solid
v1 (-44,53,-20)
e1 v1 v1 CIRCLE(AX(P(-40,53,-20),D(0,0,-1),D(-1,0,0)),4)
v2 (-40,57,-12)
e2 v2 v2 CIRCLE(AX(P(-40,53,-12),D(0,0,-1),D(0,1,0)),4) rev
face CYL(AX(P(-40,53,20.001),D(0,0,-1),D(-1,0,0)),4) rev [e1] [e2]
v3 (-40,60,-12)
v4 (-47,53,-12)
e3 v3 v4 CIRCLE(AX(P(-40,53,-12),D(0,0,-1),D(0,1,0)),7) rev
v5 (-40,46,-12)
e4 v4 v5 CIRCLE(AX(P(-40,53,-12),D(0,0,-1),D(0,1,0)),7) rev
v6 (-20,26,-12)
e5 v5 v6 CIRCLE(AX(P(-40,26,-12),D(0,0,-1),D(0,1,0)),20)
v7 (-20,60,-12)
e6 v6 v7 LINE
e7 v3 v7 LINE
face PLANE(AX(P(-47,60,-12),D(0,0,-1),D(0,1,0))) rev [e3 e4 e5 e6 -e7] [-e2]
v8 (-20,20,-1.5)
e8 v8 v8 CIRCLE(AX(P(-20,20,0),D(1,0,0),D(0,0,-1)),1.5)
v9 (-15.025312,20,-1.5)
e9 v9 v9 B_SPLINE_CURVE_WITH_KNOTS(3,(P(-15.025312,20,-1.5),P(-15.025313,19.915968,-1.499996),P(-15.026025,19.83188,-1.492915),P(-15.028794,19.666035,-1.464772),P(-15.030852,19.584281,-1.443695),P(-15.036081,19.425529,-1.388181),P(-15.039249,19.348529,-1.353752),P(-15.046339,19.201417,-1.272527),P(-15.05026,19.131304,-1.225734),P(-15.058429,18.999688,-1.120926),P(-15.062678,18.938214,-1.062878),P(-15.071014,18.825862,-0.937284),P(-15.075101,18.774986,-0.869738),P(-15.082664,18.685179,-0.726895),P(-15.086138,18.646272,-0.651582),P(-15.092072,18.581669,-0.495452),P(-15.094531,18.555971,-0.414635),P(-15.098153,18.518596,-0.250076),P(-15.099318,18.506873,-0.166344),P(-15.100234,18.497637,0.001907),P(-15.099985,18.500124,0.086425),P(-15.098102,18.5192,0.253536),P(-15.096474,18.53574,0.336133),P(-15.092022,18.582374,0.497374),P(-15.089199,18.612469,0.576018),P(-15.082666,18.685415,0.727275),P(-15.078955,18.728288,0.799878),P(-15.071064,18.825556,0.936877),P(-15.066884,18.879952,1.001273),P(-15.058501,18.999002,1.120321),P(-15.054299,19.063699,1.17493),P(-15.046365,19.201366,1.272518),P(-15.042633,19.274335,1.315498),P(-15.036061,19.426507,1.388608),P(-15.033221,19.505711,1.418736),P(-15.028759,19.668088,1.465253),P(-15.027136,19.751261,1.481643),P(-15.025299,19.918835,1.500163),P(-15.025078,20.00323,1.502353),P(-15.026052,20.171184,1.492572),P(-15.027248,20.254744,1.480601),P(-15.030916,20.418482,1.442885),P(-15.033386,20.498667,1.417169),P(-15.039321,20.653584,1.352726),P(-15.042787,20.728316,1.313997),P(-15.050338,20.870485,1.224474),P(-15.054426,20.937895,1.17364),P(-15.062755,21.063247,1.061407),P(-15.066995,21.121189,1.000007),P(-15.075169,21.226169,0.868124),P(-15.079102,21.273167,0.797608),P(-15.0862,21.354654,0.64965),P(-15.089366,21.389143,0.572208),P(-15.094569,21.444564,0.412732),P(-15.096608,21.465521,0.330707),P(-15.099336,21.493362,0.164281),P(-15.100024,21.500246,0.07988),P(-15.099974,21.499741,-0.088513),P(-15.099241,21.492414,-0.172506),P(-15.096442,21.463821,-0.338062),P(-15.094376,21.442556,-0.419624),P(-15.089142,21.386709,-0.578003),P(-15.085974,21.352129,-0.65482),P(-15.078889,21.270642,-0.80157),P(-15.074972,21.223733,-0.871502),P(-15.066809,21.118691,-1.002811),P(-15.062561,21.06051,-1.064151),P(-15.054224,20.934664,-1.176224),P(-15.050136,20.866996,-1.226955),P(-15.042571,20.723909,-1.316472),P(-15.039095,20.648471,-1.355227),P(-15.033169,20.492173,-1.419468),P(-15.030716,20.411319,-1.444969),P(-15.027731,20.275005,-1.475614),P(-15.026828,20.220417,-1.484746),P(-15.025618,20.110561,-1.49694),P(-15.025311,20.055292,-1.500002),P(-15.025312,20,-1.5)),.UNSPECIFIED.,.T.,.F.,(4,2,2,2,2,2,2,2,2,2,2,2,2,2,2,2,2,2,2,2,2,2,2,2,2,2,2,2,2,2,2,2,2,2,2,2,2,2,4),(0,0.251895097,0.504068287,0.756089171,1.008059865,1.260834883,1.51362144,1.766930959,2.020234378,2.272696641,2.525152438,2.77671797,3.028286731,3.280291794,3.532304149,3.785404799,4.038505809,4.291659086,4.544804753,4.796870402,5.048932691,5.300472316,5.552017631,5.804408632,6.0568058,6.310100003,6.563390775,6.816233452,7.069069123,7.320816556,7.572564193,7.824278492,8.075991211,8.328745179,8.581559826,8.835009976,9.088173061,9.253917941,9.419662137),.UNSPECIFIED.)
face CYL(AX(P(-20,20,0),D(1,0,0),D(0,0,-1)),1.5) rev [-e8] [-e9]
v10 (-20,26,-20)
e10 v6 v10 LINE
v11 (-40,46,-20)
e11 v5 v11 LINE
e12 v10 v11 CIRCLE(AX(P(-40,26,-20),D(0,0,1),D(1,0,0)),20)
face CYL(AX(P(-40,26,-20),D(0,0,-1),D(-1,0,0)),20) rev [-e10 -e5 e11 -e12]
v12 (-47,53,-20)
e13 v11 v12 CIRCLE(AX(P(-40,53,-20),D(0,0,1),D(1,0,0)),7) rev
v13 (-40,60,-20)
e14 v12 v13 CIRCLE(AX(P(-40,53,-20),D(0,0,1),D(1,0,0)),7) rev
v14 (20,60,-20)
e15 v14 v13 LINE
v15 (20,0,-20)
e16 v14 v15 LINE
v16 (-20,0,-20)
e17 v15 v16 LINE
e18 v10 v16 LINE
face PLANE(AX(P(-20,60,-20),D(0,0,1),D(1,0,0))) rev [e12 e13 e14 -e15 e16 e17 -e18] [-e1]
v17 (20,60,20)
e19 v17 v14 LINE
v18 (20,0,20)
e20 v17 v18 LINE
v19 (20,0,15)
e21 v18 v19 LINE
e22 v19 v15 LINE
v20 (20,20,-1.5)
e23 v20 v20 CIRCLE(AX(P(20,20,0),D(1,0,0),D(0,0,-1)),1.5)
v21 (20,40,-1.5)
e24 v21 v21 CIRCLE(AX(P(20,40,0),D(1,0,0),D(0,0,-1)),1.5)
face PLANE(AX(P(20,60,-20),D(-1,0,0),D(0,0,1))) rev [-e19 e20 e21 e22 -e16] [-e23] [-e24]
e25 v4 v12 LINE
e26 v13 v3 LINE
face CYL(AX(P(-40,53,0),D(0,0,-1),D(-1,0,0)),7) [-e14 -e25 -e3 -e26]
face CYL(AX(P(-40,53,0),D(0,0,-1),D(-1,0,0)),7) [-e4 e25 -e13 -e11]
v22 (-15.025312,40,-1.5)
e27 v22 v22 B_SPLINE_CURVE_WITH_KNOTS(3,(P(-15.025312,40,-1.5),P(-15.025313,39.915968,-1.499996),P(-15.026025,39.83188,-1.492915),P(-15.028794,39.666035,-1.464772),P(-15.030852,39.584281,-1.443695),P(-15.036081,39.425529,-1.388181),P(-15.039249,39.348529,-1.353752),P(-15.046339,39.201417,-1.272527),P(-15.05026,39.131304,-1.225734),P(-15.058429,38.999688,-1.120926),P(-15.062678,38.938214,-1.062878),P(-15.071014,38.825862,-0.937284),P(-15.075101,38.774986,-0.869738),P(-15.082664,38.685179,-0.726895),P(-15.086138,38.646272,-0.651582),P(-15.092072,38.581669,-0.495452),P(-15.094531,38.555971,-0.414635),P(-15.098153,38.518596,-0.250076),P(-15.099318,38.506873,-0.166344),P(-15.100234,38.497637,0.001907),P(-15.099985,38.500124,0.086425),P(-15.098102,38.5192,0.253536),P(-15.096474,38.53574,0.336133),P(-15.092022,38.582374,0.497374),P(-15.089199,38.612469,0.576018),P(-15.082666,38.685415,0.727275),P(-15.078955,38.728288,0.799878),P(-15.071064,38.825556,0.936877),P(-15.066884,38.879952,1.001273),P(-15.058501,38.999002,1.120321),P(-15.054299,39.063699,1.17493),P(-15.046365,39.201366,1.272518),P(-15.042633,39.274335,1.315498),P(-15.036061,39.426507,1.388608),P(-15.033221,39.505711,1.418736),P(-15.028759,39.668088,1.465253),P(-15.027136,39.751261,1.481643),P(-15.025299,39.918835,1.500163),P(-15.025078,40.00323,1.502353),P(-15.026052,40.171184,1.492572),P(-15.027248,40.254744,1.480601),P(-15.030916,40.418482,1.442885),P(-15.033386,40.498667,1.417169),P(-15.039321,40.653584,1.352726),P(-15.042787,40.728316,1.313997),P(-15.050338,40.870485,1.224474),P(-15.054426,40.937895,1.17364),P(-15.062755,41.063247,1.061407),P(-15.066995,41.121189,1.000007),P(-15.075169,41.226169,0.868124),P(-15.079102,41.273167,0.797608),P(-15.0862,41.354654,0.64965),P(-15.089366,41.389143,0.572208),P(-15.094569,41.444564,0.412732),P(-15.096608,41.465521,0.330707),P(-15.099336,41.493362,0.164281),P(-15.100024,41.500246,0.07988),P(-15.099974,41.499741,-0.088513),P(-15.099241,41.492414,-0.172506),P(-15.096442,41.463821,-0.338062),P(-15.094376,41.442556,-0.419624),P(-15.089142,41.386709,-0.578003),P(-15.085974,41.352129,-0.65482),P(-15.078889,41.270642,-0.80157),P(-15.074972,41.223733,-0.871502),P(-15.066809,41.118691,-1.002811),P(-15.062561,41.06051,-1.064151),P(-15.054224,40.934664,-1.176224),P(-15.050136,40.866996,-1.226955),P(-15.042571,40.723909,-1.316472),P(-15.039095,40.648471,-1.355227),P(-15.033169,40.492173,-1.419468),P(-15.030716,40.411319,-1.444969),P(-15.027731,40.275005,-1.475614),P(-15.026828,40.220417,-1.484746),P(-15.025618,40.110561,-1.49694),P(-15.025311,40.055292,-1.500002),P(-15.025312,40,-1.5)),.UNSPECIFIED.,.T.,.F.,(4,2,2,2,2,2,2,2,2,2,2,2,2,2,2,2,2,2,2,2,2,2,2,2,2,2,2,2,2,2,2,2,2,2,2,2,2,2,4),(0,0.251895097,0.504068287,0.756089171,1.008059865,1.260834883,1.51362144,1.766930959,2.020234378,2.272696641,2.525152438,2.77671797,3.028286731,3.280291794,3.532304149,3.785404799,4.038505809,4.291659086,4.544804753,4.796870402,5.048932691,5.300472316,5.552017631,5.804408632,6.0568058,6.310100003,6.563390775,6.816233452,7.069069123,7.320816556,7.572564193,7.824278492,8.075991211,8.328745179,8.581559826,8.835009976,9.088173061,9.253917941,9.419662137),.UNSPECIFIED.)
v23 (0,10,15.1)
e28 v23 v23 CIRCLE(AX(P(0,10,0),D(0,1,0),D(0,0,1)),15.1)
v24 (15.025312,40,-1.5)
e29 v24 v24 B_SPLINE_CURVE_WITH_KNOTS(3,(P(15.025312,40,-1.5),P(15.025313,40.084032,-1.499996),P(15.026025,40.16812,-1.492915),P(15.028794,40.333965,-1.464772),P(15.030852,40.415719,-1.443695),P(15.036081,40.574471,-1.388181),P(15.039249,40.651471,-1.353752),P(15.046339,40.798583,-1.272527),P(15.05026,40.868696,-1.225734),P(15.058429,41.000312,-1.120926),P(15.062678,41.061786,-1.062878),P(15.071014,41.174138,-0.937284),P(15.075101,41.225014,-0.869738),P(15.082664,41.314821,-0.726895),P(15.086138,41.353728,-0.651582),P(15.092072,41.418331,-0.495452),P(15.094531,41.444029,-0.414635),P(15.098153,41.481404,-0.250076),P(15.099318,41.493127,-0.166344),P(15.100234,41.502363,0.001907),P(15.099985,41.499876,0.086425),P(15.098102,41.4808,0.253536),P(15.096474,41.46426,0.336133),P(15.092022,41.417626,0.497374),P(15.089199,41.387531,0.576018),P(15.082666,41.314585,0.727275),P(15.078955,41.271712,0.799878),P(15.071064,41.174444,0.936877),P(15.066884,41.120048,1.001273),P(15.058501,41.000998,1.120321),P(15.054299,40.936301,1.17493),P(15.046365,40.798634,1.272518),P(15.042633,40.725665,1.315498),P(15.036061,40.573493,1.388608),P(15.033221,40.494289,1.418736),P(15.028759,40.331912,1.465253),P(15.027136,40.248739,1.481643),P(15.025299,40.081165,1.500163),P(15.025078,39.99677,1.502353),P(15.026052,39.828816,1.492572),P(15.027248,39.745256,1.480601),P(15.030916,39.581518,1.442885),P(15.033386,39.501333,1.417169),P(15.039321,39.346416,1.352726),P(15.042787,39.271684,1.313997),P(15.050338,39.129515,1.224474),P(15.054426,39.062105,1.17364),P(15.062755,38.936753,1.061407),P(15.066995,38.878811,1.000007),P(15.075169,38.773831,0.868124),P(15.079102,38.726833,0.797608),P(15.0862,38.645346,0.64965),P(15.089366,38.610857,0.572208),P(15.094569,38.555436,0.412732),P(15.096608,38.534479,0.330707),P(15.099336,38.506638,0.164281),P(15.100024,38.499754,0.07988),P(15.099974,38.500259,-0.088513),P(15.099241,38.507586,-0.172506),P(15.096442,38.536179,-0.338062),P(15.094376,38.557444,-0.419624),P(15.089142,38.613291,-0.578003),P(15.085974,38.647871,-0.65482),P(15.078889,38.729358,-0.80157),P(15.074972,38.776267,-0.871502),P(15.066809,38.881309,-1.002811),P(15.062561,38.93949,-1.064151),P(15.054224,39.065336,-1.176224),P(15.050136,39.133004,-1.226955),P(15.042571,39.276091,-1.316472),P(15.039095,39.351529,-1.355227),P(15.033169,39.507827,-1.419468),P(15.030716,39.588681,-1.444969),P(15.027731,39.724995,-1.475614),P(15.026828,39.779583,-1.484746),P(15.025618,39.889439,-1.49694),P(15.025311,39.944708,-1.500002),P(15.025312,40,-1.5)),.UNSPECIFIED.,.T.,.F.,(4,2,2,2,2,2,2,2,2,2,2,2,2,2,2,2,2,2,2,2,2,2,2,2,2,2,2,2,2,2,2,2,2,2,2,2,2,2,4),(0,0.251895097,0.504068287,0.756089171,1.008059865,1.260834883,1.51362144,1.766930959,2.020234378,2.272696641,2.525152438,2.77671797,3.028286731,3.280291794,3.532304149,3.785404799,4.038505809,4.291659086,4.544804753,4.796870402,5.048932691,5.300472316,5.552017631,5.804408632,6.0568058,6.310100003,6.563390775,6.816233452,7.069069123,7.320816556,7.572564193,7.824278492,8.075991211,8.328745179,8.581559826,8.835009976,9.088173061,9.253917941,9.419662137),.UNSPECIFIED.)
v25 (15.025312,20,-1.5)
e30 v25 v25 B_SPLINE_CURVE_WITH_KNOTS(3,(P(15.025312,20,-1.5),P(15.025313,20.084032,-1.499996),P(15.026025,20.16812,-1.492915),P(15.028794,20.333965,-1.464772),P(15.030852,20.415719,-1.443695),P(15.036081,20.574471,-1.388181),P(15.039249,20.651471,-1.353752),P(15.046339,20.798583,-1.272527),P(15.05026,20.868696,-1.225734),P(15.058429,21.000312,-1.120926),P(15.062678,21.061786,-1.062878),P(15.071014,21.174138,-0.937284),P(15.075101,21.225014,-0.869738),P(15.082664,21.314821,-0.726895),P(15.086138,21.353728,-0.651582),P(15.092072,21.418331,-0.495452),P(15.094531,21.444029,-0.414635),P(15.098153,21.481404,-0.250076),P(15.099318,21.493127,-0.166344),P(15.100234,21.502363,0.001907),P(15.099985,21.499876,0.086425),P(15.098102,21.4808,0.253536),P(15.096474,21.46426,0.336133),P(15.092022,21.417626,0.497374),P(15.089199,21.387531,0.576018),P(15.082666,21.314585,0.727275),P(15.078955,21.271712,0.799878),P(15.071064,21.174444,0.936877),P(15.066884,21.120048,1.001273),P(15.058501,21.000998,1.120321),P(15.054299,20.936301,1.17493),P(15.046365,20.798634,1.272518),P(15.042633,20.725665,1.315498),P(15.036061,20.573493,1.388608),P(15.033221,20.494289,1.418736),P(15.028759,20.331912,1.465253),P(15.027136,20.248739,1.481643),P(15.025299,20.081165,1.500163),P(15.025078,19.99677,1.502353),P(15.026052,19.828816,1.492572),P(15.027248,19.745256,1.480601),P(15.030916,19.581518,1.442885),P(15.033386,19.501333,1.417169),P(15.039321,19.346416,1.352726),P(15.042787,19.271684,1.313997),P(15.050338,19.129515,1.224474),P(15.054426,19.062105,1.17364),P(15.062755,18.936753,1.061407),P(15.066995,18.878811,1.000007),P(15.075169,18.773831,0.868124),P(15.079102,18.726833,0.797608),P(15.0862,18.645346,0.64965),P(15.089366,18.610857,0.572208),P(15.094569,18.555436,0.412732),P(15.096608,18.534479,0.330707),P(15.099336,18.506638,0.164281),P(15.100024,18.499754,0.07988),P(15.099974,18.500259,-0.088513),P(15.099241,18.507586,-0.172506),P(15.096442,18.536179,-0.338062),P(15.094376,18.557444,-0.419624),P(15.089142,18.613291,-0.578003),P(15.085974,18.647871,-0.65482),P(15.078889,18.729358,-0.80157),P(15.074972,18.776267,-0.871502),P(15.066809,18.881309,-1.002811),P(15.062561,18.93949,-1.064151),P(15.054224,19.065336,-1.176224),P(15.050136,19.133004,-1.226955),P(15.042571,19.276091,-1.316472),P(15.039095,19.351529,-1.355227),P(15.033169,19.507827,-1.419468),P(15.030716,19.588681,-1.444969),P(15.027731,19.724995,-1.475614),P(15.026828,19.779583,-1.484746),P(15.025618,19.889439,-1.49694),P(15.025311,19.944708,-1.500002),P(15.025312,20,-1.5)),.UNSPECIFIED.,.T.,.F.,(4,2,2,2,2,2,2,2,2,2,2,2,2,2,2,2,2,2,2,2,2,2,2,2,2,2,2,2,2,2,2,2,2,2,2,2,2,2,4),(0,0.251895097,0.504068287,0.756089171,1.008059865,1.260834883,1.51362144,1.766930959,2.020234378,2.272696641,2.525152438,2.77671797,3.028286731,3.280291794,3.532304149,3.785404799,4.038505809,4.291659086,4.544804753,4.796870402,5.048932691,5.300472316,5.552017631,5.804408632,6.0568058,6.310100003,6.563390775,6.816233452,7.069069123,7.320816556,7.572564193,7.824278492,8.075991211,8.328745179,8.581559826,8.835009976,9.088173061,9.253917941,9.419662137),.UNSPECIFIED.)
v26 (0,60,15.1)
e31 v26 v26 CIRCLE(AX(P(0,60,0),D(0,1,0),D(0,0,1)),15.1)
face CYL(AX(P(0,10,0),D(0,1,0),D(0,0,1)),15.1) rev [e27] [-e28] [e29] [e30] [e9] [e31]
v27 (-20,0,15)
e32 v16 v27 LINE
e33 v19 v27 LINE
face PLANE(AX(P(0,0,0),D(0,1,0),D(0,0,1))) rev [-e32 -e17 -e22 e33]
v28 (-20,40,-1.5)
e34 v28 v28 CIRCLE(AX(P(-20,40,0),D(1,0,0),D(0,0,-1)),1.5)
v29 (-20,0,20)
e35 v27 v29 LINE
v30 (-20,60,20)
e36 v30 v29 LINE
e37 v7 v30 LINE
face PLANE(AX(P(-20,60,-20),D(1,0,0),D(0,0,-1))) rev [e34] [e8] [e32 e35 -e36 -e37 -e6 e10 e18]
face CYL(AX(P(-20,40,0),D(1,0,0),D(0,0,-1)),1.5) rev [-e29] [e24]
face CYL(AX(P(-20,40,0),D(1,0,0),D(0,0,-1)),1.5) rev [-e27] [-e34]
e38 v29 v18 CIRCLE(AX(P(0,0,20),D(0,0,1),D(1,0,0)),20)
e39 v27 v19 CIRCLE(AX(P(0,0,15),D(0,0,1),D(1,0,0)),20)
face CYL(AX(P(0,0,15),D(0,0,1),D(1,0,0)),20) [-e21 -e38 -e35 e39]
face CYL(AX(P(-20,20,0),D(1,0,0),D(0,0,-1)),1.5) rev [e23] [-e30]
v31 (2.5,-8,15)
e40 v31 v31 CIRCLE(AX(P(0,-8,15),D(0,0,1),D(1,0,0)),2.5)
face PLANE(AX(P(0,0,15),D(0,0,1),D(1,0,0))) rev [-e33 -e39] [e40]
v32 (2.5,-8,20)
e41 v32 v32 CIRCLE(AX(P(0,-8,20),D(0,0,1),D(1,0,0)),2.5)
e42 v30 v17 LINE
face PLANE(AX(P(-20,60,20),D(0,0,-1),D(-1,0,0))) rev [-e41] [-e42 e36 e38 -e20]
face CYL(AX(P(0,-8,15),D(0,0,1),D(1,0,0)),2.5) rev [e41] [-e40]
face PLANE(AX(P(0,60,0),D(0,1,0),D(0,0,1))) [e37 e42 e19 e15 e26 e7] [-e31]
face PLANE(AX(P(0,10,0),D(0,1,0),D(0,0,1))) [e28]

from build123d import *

# Parameters (mm, degrees)
SKETCH_1_W             = 40
SKETCH_1_H             = 40
EXTRUDE_1_DEPTH        = 60
SKETCH_2_R             = 15.1
CUT_EXTRUDE_1_DEPTH    = 50
SKETCH_3_R             = 2.5
EXTRUDE_2_DEPTH        = 5
SKETCH_4_R             = 1.5
CUT_EXTRUDE_2_DEPTH    = 75.833147735
PATTERN_LINEAR_1_COUNT = 2
PATTERN_LINEAR_1_PITCH = 20
SKETCH_5_W             = 8
SKETCH_5_H             = 14
EXTRUDE_3_DEPTH        = 27
FILLET_1_R             = 7
CUT_EXTRUDE_3_REACH    = 88.076
SKETCH_6_R             = 4
FILLET_2_R             = 20


with BuildPart() as part:
    # 草圖1 → 填料-伸長1 (new body)
    with BuildSketch(Plane(origin=(0, 0, 0), x_dir=(1, 0, 0), z_dir=(0, 1, 0))):
        Rectangle(SKETCH_1_W, SKETCH_1_H)
    extrude(amount=EXTRUDE_1_DEPTH)

    # 草圖2 → 除料-伸長1 (cut)
    with BuildSketch(Plane(origin=(0, 60, 0), x_dir=(1, 0, 0), z_dir=(0, 1, 0))):
        with Locations(Location((0, 0, 0), (0, 0, 270))):
            Circle(SKETCH_2_R)
    extrude(amount=-CUT_EXTRUDE_1_DEPTH, mode=Mode.SUBTRACT)

    # 草圖3 → 填料-伸長2 (add)
    with BuildSketch(Plane.XY.offset(20)):
        with BuildLine():
            Line((-20, 0), (20, 0))
            ThreePointArc((20, 0), (0, -20), (-20, 0))
        make_face()
        with Locations((0, -8)):
            Circle(SKETCH_3_R, mode=Mode.SUBTRACT)
    extrude(amount=-EXTRUDE_2_DEPTH)

    # 草圖4 → 除料-伸長2 (cut, through all)
    with BuildSketch(Plane(origin=(20, 0, 0), x_dir=(0, 0, -1), z_dir=(1, 0, 0))):
        with Locations((0, 20)):
            Circle(SKETCH_4_R)
    cut_extrude_2 = extrude(amount=-CUT_EXTRUDE_2_DEPTH, mode=Mode.SUBTRACT)

    # 直線複製排列1: 除料-伸長2 ×2
    with Locations(*[(0, i * PATTERN_LINEAR_1_PITCH, 0) for i in range(1, PATTERN_LINEAR_1_COUNT)]):
        add(cut_extrude_2, mode=Mode.SUBTRACT)

    # 草圖5 → 填料-伸長3 (add)
    with BuildSketch(Plane.ZY.offset(20)):
        with Locations((-16, 53)):
            Rectangle(SKETCH_5_W, SKETCH_5_H)
    extrude(amount=EXTRUDE_3_DEPTH)

    # 圓角1
    fillet_1_edges = [part.edges().sort_by_distance(p)[0] for p in [
        (-47, 46, -16),
        (-47, 60, -16),
    ]]
    fillet(fillet_1_edges, radius=FILLET_1_R - 0.0001)  # a hair under: the kernel refuses the full size

    # 草圖6 → 除料-伸長3 (cut, up to next)
    with BuildSketch(Plane(origin=(0, 0, -20), x_dir=(-1, 0, 0), z_dir=(0, 0, -1)), mode=Mode.PRIVATE) as cut_extrude_3_sk1:
        with Locations((40, 53)):
            Circle(SKETCH_6_R)
    cut_extrude_3_tool1 = extrude(cut_extrude_3_sk1.sketch, amount=-CUT_EXTRUDE_3_REACH, mode=Mode.PRIVATE) & part.part
    add(cut_extrude_3_tool1.solids().sort_by_distance((-40, 53, -20))[0], mode=Mode.SUBTRACT)

    # 圓角2
    fillet_2_edges = [part.edges().sort_by_distance(p)[0] for p in [
        (-20, 46, -16),
    ]]
    fillet(fillet_2_edges, radius=FILLET_2_R)


solid = part.part
